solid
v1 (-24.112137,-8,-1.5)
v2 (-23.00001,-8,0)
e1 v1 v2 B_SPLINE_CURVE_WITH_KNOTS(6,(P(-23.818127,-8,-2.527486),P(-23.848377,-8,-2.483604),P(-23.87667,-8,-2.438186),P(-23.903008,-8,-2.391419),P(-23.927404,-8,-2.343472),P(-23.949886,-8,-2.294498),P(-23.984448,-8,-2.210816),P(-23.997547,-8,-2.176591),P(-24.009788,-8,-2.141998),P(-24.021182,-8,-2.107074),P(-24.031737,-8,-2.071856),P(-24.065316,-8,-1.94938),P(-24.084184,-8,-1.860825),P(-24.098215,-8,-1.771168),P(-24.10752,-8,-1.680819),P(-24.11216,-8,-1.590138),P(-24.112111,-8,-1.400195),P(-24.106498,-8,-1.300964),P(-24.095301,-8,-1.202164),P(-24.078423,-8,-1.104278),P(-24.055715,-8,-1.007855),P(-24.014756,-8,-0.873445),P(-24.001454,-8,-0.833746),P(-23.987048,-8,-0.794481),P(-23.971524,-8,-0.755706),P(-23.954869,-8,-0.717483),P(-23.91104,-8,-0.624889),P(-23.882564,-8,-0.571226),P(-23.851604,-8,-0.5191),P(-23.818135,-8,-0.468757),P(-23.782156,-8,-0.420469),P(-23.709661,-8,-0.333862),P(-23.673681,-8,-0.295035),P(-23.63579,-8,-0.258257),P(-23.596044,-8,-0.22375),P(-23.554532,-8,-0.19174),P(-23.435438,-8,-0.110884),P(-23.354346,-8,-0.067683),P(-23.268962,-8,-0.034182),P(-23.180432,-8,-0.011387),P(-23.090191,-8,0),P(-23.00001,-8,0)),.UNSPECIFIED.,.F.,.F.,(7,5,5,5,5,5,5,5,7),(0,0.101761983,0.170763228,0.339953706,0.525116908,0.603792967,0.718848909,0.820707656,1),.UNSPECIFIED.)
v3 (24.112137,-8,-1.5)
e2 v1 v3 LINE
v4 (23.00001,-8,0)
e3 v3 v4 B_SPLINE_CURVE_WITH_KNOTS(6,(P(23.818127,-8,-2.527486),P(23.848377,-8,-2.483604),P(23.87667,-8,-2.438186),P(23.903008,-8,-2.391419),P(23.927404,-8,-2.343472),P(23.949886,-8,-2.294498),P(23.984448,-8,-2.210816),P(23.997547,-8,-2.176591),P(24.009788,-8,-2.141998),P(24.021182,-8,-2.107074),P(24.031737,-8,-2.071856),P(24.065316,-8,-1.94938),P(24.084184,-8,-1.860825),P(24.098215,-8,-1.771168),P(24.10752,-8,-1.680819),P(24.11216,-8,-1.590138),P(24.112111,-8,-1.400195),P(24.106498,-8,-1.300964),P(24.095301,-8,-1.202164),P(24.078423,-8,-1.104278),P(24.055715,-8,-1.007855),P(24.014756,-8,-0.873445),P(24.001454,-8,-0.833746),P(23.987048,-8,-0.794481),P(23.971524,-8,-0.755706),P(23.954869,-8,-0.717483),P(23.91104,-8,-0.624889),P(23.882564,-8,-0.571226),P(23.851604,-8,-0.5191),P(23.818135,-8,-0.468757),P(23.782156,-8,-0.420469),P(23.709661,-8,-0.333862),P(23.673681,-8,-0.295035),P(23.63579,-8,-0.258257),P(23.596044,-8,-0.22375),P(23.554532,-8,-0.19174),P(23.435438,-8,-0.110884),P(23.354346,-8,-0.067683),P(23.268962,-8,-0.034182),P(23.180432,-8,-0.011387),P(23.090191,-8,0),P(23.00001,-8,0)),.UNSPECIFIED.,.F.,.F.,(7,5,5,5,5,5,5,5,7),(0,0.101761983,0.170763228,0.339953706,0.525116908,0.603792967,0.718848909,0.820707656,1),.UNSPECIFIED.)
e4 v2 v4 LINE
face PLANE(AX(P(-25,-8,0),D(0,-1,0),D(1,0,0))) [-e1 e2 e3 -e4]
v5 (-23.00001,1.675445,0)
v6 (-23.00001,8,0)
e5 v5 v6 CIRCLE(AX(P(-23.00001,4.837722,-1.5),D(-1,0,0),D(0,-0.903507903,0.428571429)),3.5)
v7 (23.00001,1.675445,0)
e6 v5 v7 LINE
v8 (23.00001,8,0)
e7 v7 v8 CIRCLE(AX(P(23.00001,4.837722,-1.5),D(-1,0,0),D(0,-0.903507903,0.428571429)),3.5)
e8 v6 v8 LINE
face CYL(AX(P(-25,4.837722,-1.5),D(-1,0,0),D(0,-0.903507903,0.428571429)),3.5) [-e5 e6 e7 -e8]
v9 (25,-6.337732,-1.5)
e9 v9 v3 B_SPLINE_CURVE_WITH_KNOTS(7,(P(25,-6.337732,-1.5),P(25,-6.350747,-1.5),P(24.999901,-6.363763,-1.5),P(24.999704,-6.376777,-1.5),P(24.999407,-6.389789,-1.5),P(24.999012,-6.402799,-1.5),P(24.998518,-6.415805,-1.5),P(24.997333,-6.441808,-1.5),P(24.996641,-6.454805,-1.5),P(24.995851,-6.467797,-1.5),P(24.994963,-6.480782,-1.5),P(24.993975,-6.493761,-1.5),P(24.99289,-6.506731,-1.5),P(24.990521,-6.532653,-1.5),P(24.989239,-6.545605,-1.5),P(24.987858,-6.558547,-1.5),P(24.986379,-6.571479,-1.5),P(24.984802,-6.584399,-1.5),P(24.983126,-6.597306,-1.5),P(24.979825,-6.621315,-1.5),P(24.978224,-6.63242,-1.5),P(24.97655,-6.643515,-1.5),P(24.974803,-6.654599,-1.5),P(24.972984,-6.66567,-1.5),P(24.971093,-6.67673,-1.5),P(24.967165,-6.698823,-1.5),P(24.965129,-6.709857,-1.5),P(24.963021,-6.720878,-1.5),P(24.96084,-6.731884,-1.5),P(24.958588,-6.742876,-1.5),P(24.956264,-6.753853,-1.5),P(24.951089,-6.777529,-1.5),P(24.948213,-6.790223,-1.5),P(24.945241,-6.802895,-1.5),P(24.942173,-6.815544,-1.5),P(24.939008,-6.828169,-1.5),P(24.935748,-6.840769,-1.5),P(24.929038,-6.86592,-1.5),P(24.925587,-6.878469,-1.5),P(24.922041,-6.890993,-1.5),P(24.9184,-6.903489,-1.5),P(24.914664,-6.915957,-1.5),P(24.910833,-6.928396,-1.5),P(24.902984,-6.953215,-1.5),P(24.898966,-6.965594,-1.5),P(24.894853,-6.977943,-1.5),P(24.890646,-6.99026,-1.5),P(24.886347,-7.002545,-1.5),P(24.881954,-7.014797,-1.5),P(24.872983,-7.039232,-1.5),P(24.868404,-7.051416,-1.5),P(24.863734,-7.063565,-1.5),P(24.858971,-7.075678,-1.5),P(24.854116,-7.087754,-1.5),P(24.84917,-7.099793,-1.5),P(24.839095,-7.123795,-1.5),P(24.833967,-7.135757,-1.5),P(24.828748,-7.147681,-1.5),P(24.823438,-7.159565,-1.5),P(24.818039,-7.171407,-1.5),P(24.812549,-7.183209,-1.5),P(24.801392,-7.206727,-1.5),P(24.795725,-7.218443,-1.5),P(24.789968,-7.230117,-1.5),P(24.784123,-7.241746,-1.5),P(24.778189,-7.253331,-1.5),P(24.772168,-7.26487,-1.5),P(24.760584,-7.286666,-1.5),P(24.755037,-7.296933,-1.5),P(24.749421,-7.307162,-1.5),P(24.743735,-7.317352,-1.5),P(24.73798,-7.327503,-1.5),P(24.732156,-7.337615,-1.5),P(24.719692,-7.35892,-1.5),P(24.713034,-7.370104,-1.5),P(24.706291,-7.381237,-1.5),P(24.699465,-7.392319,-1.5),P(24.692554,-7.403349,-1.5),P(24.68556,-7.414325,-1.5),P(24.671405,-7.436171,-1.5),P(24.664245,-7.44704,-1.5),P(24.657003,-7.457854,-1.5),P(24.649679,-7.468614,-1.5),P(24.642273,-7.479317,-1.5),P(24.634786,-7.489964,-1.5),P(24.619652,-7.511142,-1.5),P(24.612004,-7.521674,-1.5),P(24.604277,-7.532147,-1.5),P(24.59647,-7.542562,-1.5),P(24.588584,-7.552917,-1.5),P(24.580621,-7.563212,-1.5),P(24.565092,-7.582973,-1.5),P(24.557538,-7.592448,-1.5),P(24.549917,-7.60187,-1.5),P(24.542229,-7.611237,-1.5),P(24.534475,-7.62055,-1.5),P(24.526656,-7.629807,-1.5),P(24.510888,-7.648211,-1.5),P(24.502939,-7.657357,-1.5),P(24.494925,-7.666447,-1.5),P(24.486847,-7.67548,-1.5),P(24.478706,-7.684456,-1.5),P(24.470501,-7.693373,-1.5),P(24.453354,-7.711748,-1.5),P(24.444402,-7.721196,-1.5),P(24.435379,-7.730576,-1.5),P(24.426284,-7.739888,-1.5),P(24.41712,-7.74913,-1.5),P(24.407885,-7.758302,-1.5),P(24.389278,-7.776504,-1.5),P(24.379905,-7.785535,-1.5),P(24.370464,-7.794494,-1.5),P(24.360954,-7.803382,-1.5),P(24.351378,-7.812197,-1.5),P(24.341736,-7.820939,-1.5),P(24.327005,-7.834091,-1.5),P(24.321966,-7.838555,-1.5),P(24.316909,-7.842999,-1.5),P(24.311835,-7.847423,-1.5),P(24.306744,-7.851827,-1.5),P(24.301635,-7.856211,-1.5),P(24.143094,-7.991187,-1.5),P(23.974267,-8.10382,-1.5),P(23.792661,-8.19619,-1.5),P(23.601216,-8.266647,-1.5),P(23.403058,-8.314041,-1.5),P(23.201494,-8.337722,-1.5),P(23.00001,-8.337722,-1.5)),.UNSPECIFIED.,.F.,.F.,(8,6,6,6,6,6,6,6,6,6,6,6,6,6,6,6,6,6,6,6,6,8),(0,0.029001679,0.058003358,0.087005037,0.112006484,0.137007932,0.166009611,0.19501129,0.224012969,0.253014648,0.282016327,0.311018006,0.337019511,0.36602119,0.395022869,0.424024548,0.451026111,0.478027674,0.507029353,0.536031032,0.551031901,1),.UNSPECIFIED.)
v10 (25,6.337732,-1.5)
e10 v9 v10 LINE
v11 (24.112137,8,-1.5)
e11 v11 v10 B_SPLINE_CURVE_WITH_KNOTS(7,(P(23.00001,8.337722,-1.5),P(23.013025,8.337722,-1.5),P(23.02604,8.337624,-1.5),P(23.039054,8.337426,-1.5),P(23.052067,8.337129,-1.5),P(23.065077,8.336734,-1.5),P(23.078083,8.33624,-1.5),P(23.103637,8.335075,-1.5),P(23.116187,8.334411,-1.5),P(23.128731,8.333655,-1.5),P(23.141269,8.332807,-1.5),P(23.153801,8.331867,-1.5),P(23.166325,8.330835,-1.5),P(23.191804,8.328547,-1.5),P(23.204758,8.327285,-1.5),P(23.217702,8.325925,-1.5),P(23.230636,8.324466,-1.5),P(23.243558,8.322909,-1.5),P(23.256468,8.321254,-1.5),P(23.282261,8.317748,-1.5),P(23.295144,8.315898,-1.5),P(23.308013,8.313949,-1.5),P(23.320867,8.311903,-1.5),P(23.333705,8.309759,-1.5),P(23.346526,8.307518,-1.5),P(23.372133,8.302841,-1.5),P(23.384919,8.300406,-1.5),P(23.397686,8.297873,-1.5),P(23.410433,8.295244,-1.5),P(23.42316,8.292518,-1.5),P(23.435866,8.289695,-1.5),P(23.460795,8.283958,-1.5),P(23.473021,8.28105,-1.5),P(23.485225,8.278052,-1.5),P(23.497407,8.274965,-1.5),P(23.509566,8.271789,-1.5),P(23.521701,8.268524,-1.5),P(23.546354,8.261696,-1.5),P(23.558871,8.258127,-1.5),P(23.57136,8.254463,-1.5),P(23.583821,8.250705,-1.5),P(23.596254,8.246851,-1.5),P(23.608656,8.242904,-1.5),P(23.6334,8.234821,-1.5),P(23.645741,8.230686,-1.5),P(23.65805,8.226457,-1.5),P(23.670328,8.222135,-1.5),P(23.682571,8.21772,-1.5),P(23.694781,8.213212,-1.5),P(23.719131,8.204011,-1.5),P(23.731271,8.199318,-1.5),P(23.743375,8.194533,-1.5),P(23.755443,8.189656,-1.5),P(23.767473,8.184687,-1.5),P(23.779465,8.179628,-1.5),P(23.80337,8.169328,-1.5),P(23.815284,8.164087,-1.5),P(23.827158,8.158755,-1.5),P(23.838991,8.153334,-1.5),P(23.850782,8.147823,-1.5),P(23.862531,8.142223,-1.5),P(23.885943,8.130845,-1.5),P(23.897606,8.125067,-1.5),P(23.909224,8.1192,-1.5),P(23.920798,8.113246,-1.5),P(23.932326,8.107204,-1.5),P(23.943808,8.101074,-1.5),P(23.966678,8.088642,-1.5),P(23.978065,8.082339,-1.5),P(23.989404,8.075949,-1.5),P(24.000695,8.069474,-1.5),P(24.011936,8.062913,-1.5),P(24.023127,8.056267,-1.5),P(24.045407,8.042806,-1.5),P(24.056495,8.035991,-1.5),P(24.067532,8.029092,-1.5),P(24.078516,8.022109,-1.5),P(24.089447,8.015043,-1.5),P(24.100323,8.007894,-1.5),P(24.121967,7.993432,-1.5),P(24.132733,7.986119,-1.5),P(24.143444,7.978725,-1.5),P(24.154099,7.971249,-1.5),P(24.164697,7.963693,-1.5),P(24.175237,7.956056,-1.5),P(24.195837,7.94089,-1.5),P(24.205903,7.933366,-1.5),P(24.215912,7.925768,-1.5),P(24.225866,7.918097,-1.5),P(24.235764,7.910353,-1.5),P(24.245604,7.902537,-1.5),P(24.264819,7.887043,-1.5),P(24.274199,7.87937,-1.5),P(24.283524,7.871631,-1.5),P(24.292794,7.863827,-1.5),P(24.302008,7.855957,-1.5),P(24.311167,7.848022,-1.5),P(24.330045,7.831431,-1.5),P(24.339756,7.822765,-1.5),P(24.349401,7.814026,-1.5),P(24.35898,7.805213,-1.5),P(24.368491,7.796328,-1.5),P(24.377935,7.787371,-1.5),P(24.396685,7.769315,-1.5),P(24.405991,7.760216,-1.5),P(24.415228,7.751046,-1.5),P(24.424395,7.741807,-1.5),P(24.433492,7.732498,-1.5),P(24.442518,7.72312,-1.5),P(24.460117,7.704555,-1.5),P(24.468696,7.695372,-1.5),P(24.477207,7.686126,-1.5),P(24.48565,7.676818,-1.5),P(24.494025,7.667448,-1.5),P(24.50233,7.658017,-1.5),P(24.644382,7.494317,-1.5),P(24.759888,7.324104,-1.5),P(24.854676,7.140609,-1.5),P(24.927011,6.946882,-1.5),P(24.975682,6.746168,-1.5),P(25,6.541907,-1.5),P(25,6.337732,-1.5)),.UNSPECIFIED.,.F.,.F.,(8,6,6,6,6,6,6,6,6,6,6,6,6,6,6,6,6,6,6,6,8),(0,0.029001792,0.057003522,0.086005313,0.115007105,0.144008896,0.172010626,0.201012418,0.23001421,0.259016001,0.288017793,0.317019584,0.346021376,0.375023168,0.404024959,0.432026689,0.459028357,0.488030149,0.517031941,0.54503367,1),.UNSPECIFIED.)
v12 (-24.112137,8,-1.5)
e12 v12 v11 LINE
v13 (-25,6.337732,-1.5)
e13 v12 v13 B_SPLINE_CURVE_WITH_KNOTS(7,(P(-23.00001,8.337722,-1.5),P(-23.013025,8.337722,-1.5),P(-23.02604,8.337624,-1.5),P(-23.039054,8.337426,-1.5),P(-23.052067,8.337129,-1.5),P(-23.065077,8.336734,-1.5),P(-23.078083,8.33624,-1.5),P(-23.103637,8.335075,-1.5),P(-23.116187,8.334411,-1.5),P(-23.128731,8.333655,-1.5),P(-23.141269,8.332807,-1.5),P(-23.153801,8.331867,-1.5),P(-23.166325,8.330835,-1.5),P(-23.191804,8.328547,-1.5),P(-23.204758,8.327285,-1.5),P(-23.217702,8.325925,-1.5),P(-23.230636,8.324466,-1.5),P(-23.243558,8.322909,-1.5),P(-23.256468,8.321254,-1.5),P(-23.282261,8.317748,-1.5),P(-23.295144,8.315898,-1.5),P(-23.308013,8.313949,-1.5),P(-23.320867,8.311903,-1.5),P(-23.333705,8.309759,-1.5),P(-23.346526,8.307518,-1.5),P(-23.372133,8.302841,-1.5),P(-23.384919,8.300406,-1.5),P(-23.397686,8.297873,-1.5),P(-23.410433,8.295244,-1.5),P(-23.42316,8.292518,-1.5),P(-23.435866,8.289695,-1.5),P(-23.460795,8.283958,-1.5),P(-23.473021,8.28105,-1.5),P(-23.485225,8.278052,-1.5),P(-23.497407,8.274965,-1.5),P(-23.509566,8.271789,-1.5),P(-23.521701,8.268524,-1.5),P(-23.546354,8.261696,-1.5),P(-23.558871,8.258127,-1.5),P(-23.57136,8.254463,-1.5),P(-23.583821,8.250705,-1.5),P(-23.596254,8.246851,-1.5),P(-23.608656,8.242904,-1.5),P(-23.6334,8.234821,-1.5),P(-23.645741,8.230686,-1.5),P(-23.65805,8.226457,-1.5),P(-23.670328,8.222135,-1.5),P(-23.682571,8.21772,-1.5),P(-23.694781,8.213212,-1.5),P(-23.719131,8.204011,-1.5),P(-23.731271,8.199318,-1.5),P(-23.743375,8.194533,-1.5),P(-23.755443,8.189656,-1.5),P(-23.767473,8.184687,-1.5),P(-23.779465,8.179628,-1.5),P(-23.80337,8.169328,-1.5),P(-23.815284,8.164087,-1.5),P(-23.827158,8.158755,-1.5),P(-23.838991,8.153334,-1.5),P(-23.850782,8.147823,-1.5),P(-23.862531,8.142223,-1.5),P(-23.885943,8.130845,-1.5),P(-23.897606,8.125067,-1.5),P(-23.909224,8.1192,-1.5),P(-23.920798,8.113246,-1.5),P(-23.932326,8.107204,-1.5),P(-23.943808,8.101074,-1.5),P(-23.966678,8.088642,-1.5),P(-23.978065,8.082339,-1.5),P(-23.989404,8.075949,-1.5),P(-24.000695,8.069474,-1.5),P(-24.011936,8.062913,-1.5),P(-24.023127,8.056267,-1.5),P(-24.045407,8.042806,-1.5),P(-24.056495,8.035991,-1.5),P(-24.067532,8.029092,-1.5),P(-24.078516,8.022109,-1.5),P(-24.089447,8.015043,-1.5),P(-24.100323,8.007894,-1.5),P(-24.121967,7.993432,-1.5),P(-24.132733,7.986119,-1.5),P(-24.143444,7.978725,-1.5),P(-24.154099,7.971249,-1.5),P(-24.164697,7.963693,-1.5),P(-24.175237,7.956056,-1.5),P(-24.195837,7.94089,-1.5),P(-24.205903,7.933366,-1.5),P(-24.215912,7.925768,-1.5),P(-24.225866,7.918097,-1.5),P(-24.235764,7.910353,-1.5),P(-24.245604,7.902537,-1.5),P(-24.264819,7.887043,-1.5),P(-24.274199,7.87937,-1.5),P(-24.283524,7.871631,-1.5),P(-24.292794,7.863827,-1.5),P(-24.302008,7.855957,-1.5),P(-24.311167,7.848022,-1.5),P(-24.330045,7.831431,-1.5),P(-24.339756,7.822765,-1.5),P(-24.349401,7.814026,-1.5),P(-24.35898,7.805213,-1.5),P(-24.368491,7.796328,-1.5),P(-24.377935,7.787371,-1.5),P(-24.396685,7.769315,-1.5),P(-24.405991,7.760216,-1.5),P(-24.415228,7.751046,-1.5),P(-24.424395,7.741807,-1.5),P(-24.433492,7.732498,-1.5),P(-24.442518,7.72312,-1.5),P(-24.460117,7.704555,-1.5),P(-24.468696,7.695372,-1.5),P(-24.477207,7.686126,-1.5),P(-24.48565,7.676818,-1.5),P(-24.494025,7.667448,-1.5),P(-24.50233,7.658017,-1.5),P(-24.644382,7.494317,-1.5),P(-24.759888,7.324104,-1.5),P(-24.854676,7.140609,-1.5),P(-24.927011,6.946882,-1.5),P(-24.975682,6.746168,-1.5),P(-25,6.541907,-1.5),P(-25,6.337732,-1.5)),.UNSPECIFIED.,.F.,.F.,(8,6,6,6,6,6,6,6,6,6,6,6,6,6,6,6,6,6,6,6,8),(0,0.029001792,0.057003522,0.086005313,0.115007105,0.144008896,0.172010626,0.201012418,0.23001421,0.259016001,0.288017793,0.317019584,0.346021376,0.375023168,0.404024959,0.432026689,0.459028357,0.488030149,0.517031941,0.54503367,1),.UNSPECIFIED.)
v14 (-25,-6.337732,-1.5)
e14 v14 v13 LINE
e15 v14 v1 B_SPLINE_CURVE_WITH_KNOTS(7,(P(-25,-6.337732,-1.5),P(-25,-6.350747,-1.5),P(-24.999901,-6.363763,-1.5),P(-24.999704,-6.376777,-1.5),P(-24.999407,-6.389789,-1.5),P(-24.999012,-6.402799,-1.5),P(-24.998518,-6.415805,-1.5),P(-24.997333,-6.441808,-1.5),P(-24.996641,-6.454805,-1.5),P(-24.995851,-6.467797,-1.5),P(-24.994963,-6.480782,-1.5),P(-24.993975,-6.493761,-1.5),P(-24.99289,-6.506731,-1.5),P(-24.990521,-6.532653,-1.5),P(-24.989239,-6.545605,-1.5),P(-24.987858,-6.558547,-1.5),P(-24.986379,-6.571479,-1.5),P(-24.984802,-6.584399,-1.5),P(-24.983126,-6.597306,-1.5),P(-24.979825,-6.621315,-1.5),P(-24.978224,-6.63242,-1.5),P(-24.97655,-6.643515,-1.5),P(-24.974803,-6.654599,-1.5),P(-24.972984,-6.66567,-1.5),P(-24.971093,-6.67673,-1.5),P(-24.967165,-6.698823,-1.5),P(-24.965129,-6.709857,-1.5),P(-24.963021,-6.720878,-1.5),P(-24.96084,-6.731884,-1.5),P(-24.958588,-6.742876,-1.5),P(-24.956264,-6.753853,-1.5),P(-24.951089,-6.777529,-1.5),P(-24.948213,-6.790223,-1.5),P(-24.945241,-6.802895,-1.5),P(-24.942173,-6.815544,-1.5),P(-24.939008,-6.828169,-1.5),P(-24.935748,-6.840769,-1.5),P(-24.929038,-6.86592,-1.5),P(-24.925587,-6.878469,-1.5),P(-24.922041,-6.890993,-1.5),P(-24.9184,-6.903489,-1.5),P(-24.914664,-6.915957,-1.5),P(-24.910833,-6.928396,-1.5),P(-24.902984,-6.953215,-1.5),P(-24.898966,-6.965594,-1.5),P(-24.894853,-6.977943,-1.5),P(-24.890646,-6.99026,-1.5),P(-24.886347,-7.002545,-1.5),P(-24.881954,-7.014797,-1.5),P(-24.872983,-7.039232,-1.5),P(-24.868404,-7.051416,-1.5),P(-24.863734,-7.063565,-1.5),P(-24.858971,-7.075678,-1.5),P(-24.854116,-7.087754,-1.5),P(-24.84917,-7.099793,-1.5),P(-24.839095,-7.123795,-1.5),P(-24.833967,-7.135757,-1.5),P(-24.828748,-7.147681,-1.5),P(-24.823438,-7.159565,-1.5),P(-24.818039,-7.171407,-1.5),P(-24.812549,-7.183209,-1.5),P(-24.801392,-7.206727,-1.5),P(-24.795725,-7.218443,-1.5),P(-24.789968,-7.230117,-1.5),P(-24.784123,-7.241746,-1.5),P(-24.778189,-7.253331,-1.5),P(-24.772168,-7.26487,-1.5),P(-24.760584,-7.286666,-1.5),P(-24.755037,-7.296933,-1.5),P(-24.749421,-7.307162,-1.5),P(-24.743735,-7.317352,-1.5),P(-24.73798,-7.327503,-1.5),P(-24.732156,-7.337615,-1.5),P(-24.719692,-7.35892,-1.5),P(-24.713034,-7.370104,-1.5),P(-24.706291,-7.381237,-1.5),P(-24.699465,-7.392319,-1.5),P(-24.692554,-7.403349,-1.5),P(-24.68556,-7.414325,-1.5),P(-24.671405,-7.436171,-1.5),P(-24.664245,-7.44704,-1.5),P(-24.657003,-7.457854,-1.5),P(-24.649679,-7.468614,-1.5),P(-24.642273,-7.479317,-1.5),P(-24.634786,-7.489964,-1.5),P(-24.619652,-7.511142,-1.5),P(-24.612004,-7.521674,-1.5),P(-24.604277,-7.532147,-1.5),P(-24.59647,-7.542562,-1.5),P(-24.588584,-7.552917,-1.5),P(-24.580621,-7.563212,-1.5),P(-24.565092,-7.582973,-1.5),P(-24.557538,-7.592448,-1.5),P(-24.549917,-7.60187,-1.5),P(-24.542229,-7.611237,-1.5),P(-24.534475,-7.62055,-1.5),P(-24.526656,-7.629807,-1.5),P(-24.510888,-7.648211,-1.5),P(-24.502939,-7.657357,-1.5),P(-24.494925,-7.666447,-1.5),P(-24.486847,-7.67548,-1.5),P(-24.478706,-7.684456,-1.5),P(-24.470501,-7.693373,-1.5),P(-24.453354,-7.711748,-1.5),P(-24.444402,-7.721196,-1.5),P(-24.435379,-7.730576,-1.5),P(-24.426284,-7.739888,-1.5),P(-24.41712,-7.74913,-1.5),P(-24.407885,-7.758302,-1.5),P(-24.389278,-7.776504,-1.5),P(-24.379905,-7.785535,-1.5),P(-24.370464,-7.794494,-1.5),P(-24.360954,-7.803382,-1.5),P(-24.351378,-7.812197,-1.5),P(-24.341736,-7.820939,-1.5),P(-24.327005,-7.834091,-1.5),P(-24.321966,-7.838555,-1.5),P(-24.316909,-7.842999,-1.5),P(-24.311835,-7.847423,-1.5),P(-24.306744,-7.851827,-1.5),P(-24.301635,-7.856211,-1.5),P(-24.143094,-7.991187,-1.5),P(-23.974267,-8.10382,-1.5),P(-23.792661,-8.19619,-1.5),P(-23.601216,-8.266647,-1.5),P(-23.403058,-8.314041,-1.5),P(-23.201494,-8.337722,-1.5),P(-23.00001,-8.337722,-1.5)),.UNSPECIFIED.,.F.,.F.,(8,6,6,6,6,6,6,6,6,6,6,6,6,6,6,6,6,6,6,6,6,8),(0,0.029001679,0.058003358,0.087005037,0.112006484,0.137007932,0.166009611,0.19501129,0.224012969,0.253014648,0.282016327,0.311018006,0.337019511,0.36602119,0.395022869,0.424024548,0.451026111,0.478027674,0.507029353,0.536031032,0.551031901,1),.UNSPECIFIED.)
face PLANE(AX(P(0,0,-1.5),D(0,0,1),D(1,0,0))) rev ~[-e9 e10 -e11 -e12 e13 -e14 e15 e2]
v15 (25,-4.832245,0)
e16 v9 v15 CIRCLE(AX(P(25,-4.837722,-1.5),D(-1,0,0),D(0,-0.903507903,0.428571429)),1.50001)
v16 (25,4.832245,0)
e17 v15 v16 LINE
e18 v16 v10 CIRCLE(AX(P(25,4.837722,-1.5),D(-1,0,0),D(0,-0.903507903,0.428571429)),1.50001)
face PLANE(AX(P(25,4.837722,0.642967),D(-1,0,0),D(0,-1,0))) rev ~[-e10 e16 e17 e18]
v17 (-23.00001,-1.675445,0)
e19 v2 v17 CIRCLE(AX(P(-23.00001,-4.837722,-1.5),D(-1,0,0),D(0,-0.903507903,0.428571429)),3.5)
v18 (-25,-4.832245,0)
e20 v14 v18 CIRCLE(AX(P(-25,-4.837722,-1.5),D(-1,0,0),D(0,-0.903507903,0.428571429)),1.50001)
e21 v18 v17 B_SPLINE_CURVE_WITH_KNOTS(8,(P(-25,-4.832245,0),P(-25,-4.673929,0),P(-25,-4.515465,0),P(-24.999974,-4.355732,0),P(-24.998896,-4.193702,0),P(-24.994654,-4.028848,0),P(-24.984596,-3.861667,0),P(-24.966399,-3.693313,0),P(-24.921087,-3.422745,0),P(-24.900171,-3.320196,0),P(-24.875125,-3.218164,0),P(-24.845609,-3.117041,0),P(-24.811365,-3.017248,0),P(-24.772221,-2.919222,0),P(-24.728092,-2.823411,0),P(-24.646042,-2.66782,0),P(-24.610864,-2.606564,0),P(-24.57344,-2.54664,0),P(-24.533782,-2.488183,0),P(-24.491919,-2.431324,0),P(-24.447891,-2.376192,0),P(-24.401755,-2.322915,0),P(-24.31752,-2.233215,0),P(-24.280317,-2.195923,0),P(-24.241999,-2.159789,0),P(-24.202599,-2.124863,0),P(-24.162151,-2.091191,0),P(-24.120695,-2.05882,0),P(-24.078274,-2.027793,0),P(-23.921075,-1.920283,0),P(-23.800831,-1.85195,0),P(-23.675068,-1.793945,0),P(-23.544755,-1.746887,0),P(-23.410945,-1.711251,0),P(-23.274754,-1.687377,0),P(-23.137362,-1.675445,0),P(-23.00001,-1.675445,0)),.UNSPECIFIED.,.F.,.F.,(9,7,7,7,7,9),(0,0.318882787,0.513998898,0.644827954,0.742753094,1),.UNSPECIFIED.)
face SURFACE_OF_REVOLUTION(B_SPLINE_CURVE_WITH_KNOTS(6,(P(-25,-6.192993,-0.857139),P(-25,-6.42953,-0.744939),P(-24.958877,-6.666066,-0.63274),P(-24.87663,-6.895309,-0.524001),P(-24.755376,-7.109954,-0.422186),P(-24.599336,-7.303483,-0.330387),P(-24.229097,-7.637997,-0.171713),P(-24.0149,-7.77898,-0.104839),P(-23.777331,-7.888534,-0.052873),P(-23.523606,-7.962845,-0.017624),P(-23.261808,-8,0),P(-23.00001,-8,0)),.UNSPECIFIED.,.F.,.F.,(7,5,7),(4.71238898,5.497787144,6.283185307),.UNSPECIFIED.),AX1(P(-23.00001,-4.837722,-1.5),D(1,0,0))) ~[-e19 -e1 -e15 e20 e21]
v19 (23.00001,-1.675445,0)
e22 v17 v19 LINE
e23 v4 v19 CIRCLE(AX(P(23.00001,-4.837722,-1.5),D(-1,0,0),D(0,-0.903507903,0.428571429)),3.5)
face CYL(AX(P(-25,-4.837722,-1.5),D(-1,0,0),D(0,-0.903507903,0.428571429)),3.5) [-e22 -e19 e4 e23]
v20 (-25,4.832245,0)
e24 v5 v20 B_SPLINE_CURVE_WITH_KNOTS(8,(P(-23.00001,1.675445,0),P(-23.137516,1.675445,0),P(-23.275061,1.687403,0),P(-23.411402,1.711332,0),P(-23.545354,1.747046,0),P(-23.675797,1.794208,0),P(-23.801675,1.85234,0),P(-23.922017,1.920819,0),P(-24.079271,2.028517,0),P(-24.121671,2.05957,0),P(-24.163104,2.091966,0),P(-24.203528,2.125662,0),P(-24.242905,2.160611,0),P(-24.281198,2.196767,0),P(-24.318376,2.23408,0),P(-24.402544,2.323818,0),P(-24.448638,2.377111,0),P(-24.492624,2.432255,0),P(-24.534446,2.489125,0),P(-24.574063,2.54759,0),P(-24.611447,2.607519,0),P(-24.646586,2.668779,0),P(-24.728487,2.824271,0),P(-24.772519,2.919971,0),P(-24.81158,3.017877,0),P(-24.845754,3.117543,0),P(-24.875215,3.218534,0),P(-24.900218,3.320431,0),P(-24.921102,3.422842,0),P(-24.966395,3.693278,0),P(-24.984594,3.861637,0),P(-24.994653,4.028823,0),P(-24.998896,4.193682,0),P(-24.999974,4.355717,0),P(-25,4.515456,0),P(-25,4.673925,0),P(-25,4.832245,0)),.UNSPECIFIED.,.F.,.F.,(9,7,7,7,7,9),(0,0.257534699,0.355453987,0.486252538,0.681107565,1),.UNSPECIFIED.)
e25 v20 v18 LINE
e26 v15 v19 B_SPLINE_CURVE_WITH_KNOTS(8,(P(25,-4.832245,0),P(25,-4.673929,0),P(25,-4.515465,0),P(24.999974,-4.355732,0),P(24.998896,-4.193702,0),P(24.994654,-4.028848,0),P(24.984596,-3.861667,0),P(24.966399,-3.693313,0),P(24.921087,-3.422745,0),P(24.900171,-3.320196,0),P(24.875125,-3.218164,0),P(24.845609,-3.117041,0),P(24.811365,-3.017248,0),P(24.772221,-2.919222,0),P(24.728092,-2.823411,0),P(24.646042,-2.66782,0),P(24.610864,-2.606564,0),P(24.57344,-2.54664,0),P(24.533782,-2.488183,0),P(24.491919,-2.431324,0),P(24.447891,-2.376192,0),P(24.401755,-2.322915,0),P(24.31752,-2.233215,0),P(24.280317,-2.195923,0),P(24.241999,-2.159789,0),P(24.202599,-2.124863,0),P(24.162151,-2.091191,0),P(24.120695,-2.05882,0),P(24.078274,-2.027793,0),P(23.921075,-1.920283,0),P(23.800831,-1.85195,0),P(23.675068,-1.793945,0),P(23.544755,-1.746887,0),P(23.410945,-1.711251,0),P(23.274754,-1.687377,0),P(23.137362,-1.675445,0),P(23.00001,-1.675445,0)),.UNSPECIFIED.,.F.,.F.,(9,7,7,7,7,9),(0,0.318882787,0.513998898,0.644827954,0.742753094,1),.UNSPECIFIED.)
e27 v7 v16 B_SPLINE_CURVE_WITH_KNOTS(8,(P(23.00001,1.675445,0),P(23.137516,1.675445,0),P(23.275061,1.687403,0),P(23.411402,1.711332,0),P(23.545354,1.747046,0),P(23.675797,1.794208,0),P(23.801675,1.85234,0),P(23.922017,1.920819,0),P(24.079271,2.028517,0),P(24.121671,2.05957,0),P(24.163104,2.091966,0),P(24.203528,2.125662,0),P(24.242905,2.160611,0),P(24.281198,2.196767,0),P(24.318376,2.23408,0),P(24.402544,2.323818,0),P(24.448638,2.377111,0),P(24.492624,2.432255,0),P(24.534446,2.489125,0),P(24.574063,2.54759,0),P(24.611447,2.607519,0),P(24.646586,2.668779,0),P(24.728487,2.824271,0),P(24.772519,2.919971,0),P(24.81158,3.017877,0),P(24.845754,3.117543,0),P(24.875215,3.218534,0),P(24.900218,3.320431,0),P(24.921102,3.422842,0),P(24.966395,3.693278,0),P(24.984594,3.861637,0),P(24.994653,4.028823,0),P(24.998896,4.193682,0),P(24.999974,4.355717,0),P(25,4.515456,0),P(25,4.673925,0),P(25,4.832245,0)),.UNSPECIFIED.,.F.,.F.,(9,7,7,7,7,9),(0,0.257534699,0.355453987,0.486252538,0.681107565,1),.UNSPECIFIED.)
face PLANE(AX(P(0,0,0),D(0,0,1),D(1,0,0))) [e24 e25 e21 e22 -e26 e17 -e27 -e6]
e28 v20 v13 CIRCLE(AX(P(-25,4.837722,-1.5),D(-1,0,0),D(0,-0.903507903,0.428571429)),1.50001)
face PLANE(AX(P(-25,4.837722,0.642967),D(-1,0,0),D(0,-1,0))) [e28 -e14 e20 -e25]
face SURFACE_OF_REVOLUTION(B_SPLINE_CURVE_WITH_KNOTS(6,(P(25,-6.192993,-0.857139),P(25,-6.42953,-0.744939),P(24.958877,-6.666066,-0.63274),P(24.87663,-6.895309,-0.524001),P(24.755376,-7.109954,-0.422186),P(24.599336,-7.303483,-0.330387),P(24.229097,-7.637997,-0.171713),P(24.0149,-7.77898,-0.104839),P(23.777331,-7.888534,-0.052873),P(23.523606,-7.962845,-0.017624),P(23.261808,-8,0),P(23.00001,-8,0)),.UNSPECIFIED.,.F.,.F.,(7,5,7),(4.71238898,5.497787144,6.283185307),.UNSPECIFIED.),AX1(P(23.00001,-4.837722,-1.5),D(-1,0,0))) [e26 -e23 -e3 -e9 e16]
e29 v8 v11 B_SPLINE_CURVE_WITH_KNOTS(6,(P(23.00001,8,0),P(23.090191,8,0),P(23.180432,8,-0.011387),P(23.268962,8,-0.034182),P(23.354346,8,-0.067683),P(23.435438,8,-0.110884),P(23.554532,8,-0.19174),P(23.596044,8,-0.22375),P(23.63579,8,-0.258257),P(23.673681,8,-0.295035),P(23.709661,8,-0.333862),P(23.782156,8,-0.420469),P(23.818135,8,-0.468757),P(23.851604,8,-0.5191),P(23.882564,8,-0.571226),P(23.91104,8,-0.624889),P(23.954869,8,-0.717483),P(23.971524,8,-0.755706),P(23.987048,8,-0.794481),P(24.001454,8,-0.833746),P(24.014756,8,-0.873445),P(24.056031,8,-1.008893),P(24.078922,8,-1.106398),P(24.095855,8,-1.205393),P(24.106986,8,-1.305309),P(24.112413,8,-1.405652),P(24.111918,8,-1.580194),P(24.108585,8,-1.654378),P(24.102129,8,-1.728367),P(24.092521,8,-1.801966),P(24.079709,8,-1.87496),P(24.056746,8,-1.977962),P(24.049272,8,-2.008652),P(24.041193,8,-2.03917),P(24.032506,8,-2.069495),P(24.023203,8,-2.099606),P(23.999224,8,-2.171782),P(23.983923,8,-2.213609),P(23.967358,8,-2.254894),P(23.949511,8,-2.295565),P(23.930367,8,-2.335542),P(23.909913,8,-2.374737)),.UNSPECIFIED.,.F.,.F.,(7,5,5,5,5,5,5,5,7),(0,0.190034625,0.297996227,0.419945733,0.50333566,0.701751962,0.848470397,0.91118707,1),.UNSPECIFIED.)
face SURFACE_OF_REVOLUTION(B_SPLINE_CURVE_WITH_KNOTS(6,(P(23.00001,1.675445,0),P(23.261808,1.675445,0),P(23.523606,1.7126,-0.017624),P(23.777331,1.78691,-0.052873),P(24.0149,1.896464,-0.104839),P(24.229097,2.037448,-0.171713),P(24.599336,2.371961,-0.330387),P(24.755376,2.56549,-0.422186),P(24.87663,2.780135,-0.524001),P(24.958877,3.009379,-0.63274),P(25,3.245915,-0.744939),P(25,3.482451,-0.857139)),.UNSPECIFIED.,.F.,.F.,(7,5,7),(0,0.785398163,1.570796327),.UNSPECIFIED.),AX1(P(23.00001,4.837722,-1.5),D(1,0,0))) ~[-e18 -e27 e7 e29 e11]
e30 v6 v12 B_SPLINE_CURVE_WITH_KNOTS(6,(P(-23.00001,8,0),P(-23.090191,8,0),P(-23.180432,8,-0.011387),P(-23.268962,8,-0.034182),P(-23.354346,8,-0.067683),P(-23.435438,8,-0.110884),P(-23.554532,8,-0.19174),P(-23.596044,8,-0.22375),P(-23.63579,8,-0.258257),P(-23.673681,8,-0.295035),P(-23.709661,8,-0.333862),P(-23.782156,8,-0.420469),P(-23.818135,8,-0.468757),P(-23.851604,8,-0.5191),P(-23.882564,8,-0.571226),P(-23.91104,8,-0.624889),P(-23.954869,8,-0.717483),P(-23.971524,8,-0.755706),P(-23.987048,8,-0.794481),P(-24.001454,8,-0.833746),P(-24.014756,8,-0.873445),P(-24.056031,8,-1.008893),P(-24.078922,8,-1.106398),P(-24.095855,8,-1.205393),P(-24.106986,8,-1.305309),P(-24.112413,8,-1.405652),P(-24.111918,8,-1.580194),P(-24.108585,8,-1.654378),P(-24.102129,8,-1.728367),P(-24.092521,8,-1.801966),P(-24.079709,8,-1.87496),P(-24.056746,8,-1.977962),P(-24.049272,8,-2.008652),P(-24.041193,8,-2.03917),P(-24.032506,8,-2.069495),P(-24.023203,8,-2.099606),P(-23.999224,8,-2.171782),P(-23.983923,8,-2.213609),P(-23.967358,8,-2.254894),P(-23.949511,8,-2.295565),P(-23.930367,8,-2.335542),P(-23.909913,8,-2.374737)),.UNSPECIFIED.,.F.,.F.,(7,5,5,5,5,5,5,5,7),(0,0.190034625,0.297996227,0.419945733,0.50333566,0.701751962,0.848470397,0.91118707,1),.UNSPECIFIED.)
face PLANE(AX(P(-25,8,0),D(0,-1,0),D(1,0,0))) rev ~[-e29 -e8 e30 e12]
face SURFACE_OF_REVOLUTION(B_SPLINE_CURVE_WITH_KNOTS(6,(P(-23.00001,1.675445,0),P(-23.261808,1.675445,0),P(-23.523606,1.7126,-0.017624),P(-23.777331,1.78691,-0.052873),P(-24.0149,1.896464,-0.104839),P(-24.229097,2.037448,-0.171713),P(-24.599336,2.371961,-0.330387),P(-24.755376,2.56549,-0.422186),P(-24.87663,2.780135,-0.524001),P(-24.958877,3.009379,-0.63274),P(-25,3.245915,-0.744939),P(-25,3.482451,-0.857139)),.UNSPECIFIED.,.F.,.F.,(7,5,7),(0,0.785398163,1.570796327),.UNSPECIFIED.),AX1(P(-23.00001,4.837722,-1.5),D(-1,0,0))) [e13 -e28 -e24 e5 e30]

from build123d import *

# Parameters (mm, degrees)
F0_W     = 50
F0_H     = 16
F1_DEPTH = 1.5
F3_DEPTH = 50
F4_R     = 1.99999


# Not quite as in the source:
# - a fillet or chamfer is up to 0.001 mm smaller than in the source, because OpenCascade refuses the exact size


with BuildPart() as f1:
    # F0 (on Top) → F1 (new body)
    with BuildSketch(Plane.XY):
        Rectangle(F0_W, F0_H)
    extrude(amount=-F1_DEPTH)

    # F2 (on face) → F3 (join)
    with BuildSketch(Plane(origin=(-25, 0, 0), x_dir=(0, -1, 0), z_dir=(-1, 0, 0))):
        with BuildLine():
            ThreePointArc((-1.6754446797, 0), (-4.8377223398, 2), (-8, 0))
            Line((-8, 0), (-1.6754446797, 0))
        make_face()
        with BuildLine():
            ThreePointArc((8, 0), (4.8377223398, 2), (1.6754446797, 0))
            Line((1.6754446797, 0), (8, 0))
        make_face()
    extrude(amount=-F3_DEPTH)

    # F4 (radius 2 in the source; OpenCascade refuses exactly that, so slightly less here)
    f4_edges = [f1.edges().sort_by_distance(p)[0] for p in [
        (-25, -4.837722, 2),
        (-25, 4.837722, 2),
        (25, -4.837722, 2),
        (25, 4.837722, 2),
    ]]
    fillet(f4_edges, radius=F4_R)


solid = f1.part
